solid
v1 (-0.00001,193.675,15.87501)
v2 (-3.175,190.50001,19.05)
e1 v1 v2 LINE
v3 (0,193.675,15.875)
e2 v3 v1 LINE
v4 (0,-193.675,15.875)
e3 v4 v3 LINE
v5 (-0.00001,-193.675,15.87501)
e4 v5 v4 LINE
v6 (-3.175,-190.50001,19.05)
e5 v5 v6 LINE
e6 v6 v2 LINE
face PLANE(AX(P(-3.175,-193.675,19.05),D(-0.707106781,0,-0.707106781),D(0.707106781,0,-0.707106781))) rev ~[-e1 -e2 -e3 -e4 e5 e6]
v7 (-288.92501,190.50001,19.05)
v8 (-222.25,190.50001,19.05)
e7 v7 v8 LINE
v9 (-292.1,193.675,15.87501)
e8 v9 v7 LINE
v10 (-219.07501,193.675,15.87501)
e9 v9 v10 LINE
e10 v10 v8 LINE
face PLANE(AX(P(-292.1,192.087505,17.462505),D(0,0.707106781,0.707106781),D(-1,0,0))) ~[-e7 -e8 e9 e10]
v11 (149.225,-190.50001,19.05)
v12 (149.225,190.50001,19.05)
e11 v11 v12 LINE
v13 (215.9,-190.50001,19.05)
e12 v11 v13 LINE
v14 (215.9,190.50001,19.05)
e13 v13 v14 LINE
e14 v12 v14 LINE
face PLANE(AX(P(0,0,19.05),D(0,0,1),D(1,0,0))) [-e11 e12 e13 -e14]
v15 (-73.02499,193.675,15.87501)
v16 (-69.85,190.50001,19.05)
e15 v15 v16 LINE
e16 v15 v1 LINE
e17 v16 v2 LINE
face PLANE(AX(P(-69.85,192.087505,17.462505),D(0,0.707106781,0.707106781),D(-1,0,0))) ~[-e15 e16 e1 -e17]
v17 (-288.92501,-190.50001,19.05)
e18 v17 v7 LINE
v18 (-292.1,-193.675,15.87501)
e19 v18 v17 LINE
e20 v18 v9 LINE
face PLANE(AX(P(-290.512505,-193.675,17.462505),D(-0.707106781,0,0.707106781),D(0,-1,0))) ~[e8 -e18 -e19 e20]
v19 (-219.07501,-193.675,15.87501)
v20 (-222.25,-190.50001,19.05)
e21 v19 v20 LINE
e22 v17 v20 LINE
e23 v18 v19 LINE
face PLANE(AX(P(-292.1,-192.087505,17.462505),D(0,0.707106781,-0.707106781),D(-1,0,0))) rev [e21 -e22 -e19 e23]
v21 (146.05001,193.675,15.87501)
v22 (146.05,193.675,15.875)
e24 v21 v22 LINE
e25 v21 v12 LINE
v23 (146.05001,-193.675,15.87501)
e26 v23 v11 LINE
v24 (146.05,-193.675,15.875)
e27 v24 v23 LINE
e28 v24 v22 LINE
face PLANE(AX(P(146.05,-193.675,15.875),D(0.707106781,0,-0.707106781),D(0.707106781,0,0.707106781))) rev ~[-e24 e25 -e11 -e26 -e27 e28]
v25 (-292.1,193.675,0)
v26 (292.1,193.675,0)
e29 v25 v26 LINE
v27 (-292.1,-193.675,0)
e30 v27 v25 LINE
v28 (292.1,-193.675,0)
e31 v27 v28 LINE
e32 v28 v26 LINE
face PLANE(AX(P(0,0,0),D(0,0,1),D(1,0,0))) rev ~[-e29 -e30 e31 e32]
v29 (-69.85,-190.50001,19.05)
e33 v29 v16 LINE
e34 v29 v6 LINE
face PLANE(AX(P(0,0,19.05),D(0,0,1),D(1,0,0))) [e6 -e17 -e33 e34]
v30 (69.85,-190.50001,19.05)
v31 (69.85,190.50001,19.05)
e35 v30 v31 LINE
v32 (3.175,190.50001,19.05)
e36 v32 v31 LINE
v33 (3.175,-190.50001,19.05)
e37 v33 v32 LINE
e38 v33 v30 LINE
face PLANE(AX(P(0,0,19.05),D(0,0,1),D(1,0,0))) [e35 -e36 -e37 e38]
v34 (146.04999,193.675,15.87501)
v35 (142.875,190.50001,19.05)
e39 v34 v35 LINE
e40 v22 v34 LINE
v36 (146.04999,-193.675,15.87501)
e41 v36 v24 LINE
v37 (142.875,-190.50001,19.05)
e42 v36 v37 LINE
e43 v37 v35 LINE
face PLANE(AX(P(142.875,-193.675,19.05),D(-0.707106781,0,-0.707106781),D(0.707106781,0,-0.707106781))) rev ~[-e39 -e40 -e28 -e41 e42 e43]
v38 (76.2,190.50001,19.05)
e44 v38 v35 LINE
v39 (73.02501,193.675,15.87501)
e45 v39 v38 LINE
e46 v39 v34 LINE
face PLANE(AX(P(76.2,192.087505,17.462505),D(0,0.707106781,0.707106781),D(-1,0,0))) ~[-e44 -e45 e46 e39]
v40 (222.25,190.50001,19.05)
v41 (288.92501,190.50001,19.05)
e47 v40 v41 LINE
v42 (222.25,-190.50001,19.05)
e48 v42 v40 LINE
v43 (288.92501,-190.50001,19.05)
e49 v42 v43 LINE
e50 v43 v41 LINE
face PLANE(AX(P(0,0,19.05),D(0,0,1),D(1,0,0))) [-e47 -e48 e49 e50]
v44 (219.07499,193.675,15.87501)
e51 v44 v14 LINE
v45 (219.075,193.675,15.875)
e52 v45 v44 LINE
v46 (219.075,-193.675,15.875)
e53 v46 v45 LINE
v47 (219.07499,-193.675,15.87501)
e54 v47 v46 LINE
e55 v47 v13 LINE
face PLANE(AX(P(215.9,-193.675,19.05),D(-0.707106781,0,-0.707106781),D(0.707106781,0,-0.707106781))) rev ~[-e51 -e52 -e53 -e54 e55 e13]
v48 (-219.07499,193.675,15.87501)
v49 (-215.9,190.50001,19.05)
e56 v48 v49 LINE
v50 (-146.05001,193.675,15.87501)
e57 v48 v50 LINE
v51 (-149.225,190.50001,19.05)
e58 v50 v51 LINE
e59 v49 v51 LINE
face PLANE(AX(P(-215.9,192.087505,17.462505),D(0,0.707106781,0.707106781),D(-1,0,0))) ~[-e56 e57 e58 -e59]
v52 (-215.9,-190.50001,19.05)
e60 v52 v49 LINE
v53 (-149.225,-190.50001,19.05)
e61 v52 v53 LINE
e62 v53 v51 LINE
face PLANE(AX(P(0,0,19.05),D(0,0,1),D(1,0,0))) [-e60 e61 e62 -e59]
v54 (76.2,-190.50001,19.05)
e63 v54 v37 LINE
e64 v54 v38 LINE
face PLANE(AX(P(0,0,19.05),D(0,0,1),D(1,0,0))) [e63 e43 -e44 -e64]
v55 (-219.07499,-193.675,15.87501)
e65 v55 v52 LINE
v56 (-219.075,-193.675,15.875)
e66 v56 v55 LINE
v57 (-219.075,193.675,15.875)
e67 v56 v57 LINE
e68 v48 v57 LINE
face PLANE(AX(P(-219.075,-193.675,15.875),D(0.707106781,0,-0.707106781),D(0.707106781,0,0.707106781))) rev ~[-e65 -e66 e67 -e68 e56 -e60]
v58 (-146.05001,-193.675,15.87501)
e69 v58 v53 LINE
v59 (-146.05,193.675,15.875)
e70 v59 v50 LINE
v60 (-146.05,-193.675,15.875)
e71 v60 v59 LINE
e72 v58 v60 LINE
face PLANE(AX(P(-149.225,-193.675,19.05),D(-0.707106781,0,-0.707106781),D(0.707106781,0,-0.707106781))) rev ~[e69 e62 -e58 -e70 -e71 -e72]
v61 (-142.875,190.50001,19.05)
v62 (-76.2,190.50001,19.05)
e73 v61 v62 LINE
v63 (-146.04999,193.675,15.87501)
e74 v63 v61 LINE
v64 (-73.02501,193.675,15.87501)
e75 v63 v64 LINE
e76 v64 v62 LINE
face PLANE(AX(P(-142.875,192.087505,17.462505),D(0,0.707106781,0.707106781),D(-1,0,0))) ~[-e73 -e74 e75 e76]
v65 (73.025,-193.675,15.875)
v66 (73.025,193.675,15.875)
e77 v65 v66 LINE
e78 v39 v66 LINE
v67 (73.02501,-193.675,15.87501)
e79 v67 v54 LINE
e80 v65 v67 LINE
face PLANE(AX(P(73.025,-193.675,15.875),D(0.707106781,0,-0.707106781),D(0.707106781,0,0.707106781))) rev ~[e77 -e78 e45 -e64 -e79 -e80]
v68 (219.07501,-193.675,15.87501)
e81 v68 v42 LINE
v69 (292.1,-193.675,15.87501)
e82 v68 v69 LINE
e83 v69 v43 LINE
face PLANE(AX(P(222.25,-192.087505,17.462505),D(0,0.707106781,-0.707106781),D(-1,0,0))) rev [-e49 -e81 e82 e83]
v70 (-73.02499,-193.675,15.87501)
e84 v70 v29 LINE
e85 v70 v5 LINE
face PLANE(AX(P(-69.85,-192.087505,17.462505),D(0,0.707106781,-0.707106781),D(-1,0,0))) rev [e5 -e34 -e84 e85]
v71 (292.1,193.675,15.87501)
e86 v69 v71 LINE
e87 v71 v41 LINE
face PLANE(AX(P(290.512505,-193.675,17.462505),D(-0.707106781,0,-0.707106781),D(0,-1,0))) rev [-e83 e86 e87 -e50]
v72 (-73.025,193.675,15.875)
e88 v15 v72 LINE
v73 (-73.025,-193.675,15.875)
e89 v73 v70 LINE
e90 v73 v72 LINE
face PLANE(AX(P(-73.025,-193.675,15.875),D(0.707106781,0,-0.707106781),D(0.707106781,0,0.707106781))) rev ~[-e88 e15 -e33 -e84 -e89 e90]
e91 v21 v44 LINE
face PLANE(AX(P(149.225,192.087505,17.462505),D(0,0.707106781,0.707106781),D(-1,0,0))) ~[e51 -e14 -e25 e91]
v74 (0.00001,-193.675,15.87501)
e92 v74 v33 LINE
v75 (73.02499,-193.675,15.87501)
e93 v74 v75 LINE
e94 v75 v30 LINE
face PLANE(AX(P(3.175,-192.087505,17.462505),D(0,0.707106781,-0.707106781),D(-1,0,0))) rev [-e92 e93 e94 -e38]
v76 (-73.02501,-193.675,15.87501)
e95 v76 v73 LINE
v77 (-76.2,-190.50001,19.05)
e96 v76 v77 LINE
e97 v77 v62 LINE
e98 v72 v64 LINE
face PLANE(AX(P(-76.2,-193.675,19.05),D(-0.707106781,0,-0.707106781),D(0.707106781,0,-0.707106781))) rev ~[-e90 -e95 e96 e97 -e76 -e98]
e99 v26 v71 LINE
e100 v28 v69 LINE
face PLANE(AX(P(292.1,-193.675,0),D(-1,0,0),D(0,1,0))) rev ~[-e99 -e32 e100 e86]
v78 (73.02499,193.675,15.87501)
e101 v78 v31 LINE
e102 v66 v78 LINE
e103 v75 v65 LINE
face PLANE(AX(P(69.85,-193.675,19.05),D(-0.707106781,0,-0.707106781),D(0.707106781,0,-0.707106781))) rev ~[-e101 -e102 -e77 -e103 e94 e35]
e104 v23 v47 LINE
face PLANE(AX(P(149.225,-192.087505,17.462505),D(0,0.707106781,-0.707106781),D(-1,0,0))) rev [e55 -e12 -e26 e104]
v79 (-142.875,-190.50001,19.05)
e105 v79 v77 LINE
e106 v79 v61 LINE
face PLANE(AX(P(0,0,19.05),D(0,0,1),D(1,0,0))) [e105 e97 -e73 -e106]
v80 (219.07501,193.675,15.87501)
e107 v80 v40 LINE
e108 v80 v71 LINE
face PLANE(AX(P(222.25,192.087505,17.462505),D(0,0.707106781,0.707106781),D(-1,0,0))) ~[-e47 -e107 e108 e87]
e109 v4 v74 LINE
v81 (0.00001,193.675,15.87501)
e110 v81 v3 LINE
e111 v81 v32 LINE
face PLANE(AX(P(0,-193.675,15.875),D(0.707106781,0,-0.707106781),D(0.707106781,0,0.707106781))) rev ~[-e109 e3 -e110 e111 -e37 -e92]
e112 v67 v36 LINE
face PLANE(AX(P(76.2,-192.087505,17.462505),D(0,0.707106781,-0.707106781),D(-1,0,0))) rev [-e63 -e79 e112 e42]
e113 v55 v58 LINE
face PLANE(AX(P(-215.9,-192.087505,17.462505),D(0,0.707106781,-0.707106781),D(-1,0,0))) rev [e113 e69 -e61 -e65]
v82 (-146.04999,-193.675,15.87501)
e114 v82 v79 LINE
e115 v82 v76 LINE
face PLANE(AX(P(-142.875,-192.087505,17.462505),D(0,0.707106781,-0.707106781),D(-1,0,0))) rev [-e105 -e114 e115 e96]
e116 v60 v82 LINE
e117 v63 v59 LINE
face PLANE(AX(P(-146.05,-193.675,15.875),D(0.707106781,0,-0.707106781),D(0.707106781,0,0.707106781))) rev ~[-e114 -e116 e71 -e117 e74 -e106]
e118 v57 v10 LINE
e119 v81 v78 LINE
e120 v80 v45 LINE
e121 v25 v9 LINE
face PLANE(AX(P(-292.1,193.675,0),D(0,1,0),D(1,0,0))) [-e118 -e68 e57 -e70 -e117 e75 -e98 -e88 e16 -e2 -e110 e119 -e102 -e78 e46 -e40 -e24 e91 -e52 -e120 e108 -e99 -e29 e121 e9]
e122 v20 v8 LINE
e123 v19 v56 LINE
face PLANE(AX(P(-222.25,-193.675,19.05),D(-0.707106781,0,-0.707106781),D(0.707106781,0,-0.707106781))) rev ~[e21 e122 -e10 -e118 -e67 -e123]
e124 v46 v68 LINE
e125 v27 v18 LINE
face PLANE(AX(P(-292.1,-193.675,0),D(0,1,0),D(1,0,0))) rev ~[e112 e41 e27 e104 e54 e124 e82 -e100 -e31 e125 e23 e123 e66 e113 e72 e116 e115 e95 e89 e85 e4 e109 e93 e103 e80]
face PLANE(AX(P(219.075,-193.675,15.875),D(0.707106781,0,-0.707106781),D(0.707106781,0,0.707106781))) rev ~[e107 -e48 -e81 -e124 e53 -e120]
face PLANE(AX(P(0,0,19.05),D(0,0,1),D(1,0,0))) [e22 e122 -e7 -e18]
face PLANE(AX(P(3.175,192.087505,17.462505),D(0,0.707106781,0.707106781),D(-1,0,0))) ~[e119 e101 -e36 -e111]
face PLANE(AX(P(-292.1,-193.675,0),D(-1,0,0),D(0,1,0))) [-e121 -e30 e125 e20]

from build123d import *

# Parameters (mm, degrees)
F0_W     = 584.2
F0_H     = 387.35
F1_DEPTH = 19.05
F3_DEPTH = 387.351
F4_SIZE  = 3.17499


# Not quite as in the source:
# - a fillet or chamfer is up to 0.001 mm smaller than in the source, because OpenCascade refuses the exact size


with BuildPart() as f1:
    # F0 (on Top) → F1 (new body)
    with BuildSketch(Plane.XY):
        Rectangle(F0_W, F0_H)
    extrude(amount=F1_DEPTH)

    # F2 (on face) → F3 (cut, through all)
    with BuildSketch(Plane.XZ.offset(193.675)):
        Polygon((-219.075, 19.05), (-222.25, 19.05), (-219.075, 15.875), (-215.9, 19.05), align=None)
        Polygon((-146.05, 19.05), (-149.225, 19.05), (-146.05, 15.875), (-142.875, 19.05), align=None)
        Polygon((-73.025, 19.05), (-76.2, 19.05), (-73.025, 15.875), (-69.85, 19.05), align=None)
        Polygon((0, 19.05), (-3.175, 19.05), (0, 15.875), (3.175, 19.05), align=None)
        Polygon((73.025, 19.05), (69.85, 19.05), (73.025, 15.875), (76.2, 19.05), align=None)
        Polygon((146.05, 19.05), (142.875, 19.05), (146.05, 15.875), (149.225, 19.05), align=None)
        Polygon((219.075, 19.05), (215.9, 19.05), (219.075, 15.875), (222.25, 19.05), align=None)
    extrude(amount=-F3_DEPTH, mode=Mode.SUBTRACT)

    # F4 (size 3.175 in the source; OpenCascade refuses exactly that, so slightly less here)
    f4_edges = [f1.edges().sort_by_distance(p)[0] for p in [
        (-292.1, 0, 19.05),
        (-257.175, -193.675, 19.05),
        (-182.5625, -193.675, 19.05),
        (-109.5375, -193.675, 19.05),
        (-36.5125, -193.675, 19.05),
        (36.5125, -193.675, 19.05),
        (109.5375, -193.675, 19.05),
        (182.5625, -193.675, 19.05),
        (257.175, -193.675, 19.05),
        (257.175, 193.675, 19.05),
        (182.5625, 193.675, 19.05),
        (109.5375, 193.675, 19.05),
        (36.5125, 193.675, 19.05),
        (-36.5125, 193.675, 19.05),
        (-109.5375, 193.675, 19.05),
        (-182.5625, 193.675, 19.05),
        (-257.175, 193.675, 19.05),
        (292.1, 0, 19.05),
    ]]
    chamfer(f4_edges, length=F4_SIZE)


solid = f1.part
